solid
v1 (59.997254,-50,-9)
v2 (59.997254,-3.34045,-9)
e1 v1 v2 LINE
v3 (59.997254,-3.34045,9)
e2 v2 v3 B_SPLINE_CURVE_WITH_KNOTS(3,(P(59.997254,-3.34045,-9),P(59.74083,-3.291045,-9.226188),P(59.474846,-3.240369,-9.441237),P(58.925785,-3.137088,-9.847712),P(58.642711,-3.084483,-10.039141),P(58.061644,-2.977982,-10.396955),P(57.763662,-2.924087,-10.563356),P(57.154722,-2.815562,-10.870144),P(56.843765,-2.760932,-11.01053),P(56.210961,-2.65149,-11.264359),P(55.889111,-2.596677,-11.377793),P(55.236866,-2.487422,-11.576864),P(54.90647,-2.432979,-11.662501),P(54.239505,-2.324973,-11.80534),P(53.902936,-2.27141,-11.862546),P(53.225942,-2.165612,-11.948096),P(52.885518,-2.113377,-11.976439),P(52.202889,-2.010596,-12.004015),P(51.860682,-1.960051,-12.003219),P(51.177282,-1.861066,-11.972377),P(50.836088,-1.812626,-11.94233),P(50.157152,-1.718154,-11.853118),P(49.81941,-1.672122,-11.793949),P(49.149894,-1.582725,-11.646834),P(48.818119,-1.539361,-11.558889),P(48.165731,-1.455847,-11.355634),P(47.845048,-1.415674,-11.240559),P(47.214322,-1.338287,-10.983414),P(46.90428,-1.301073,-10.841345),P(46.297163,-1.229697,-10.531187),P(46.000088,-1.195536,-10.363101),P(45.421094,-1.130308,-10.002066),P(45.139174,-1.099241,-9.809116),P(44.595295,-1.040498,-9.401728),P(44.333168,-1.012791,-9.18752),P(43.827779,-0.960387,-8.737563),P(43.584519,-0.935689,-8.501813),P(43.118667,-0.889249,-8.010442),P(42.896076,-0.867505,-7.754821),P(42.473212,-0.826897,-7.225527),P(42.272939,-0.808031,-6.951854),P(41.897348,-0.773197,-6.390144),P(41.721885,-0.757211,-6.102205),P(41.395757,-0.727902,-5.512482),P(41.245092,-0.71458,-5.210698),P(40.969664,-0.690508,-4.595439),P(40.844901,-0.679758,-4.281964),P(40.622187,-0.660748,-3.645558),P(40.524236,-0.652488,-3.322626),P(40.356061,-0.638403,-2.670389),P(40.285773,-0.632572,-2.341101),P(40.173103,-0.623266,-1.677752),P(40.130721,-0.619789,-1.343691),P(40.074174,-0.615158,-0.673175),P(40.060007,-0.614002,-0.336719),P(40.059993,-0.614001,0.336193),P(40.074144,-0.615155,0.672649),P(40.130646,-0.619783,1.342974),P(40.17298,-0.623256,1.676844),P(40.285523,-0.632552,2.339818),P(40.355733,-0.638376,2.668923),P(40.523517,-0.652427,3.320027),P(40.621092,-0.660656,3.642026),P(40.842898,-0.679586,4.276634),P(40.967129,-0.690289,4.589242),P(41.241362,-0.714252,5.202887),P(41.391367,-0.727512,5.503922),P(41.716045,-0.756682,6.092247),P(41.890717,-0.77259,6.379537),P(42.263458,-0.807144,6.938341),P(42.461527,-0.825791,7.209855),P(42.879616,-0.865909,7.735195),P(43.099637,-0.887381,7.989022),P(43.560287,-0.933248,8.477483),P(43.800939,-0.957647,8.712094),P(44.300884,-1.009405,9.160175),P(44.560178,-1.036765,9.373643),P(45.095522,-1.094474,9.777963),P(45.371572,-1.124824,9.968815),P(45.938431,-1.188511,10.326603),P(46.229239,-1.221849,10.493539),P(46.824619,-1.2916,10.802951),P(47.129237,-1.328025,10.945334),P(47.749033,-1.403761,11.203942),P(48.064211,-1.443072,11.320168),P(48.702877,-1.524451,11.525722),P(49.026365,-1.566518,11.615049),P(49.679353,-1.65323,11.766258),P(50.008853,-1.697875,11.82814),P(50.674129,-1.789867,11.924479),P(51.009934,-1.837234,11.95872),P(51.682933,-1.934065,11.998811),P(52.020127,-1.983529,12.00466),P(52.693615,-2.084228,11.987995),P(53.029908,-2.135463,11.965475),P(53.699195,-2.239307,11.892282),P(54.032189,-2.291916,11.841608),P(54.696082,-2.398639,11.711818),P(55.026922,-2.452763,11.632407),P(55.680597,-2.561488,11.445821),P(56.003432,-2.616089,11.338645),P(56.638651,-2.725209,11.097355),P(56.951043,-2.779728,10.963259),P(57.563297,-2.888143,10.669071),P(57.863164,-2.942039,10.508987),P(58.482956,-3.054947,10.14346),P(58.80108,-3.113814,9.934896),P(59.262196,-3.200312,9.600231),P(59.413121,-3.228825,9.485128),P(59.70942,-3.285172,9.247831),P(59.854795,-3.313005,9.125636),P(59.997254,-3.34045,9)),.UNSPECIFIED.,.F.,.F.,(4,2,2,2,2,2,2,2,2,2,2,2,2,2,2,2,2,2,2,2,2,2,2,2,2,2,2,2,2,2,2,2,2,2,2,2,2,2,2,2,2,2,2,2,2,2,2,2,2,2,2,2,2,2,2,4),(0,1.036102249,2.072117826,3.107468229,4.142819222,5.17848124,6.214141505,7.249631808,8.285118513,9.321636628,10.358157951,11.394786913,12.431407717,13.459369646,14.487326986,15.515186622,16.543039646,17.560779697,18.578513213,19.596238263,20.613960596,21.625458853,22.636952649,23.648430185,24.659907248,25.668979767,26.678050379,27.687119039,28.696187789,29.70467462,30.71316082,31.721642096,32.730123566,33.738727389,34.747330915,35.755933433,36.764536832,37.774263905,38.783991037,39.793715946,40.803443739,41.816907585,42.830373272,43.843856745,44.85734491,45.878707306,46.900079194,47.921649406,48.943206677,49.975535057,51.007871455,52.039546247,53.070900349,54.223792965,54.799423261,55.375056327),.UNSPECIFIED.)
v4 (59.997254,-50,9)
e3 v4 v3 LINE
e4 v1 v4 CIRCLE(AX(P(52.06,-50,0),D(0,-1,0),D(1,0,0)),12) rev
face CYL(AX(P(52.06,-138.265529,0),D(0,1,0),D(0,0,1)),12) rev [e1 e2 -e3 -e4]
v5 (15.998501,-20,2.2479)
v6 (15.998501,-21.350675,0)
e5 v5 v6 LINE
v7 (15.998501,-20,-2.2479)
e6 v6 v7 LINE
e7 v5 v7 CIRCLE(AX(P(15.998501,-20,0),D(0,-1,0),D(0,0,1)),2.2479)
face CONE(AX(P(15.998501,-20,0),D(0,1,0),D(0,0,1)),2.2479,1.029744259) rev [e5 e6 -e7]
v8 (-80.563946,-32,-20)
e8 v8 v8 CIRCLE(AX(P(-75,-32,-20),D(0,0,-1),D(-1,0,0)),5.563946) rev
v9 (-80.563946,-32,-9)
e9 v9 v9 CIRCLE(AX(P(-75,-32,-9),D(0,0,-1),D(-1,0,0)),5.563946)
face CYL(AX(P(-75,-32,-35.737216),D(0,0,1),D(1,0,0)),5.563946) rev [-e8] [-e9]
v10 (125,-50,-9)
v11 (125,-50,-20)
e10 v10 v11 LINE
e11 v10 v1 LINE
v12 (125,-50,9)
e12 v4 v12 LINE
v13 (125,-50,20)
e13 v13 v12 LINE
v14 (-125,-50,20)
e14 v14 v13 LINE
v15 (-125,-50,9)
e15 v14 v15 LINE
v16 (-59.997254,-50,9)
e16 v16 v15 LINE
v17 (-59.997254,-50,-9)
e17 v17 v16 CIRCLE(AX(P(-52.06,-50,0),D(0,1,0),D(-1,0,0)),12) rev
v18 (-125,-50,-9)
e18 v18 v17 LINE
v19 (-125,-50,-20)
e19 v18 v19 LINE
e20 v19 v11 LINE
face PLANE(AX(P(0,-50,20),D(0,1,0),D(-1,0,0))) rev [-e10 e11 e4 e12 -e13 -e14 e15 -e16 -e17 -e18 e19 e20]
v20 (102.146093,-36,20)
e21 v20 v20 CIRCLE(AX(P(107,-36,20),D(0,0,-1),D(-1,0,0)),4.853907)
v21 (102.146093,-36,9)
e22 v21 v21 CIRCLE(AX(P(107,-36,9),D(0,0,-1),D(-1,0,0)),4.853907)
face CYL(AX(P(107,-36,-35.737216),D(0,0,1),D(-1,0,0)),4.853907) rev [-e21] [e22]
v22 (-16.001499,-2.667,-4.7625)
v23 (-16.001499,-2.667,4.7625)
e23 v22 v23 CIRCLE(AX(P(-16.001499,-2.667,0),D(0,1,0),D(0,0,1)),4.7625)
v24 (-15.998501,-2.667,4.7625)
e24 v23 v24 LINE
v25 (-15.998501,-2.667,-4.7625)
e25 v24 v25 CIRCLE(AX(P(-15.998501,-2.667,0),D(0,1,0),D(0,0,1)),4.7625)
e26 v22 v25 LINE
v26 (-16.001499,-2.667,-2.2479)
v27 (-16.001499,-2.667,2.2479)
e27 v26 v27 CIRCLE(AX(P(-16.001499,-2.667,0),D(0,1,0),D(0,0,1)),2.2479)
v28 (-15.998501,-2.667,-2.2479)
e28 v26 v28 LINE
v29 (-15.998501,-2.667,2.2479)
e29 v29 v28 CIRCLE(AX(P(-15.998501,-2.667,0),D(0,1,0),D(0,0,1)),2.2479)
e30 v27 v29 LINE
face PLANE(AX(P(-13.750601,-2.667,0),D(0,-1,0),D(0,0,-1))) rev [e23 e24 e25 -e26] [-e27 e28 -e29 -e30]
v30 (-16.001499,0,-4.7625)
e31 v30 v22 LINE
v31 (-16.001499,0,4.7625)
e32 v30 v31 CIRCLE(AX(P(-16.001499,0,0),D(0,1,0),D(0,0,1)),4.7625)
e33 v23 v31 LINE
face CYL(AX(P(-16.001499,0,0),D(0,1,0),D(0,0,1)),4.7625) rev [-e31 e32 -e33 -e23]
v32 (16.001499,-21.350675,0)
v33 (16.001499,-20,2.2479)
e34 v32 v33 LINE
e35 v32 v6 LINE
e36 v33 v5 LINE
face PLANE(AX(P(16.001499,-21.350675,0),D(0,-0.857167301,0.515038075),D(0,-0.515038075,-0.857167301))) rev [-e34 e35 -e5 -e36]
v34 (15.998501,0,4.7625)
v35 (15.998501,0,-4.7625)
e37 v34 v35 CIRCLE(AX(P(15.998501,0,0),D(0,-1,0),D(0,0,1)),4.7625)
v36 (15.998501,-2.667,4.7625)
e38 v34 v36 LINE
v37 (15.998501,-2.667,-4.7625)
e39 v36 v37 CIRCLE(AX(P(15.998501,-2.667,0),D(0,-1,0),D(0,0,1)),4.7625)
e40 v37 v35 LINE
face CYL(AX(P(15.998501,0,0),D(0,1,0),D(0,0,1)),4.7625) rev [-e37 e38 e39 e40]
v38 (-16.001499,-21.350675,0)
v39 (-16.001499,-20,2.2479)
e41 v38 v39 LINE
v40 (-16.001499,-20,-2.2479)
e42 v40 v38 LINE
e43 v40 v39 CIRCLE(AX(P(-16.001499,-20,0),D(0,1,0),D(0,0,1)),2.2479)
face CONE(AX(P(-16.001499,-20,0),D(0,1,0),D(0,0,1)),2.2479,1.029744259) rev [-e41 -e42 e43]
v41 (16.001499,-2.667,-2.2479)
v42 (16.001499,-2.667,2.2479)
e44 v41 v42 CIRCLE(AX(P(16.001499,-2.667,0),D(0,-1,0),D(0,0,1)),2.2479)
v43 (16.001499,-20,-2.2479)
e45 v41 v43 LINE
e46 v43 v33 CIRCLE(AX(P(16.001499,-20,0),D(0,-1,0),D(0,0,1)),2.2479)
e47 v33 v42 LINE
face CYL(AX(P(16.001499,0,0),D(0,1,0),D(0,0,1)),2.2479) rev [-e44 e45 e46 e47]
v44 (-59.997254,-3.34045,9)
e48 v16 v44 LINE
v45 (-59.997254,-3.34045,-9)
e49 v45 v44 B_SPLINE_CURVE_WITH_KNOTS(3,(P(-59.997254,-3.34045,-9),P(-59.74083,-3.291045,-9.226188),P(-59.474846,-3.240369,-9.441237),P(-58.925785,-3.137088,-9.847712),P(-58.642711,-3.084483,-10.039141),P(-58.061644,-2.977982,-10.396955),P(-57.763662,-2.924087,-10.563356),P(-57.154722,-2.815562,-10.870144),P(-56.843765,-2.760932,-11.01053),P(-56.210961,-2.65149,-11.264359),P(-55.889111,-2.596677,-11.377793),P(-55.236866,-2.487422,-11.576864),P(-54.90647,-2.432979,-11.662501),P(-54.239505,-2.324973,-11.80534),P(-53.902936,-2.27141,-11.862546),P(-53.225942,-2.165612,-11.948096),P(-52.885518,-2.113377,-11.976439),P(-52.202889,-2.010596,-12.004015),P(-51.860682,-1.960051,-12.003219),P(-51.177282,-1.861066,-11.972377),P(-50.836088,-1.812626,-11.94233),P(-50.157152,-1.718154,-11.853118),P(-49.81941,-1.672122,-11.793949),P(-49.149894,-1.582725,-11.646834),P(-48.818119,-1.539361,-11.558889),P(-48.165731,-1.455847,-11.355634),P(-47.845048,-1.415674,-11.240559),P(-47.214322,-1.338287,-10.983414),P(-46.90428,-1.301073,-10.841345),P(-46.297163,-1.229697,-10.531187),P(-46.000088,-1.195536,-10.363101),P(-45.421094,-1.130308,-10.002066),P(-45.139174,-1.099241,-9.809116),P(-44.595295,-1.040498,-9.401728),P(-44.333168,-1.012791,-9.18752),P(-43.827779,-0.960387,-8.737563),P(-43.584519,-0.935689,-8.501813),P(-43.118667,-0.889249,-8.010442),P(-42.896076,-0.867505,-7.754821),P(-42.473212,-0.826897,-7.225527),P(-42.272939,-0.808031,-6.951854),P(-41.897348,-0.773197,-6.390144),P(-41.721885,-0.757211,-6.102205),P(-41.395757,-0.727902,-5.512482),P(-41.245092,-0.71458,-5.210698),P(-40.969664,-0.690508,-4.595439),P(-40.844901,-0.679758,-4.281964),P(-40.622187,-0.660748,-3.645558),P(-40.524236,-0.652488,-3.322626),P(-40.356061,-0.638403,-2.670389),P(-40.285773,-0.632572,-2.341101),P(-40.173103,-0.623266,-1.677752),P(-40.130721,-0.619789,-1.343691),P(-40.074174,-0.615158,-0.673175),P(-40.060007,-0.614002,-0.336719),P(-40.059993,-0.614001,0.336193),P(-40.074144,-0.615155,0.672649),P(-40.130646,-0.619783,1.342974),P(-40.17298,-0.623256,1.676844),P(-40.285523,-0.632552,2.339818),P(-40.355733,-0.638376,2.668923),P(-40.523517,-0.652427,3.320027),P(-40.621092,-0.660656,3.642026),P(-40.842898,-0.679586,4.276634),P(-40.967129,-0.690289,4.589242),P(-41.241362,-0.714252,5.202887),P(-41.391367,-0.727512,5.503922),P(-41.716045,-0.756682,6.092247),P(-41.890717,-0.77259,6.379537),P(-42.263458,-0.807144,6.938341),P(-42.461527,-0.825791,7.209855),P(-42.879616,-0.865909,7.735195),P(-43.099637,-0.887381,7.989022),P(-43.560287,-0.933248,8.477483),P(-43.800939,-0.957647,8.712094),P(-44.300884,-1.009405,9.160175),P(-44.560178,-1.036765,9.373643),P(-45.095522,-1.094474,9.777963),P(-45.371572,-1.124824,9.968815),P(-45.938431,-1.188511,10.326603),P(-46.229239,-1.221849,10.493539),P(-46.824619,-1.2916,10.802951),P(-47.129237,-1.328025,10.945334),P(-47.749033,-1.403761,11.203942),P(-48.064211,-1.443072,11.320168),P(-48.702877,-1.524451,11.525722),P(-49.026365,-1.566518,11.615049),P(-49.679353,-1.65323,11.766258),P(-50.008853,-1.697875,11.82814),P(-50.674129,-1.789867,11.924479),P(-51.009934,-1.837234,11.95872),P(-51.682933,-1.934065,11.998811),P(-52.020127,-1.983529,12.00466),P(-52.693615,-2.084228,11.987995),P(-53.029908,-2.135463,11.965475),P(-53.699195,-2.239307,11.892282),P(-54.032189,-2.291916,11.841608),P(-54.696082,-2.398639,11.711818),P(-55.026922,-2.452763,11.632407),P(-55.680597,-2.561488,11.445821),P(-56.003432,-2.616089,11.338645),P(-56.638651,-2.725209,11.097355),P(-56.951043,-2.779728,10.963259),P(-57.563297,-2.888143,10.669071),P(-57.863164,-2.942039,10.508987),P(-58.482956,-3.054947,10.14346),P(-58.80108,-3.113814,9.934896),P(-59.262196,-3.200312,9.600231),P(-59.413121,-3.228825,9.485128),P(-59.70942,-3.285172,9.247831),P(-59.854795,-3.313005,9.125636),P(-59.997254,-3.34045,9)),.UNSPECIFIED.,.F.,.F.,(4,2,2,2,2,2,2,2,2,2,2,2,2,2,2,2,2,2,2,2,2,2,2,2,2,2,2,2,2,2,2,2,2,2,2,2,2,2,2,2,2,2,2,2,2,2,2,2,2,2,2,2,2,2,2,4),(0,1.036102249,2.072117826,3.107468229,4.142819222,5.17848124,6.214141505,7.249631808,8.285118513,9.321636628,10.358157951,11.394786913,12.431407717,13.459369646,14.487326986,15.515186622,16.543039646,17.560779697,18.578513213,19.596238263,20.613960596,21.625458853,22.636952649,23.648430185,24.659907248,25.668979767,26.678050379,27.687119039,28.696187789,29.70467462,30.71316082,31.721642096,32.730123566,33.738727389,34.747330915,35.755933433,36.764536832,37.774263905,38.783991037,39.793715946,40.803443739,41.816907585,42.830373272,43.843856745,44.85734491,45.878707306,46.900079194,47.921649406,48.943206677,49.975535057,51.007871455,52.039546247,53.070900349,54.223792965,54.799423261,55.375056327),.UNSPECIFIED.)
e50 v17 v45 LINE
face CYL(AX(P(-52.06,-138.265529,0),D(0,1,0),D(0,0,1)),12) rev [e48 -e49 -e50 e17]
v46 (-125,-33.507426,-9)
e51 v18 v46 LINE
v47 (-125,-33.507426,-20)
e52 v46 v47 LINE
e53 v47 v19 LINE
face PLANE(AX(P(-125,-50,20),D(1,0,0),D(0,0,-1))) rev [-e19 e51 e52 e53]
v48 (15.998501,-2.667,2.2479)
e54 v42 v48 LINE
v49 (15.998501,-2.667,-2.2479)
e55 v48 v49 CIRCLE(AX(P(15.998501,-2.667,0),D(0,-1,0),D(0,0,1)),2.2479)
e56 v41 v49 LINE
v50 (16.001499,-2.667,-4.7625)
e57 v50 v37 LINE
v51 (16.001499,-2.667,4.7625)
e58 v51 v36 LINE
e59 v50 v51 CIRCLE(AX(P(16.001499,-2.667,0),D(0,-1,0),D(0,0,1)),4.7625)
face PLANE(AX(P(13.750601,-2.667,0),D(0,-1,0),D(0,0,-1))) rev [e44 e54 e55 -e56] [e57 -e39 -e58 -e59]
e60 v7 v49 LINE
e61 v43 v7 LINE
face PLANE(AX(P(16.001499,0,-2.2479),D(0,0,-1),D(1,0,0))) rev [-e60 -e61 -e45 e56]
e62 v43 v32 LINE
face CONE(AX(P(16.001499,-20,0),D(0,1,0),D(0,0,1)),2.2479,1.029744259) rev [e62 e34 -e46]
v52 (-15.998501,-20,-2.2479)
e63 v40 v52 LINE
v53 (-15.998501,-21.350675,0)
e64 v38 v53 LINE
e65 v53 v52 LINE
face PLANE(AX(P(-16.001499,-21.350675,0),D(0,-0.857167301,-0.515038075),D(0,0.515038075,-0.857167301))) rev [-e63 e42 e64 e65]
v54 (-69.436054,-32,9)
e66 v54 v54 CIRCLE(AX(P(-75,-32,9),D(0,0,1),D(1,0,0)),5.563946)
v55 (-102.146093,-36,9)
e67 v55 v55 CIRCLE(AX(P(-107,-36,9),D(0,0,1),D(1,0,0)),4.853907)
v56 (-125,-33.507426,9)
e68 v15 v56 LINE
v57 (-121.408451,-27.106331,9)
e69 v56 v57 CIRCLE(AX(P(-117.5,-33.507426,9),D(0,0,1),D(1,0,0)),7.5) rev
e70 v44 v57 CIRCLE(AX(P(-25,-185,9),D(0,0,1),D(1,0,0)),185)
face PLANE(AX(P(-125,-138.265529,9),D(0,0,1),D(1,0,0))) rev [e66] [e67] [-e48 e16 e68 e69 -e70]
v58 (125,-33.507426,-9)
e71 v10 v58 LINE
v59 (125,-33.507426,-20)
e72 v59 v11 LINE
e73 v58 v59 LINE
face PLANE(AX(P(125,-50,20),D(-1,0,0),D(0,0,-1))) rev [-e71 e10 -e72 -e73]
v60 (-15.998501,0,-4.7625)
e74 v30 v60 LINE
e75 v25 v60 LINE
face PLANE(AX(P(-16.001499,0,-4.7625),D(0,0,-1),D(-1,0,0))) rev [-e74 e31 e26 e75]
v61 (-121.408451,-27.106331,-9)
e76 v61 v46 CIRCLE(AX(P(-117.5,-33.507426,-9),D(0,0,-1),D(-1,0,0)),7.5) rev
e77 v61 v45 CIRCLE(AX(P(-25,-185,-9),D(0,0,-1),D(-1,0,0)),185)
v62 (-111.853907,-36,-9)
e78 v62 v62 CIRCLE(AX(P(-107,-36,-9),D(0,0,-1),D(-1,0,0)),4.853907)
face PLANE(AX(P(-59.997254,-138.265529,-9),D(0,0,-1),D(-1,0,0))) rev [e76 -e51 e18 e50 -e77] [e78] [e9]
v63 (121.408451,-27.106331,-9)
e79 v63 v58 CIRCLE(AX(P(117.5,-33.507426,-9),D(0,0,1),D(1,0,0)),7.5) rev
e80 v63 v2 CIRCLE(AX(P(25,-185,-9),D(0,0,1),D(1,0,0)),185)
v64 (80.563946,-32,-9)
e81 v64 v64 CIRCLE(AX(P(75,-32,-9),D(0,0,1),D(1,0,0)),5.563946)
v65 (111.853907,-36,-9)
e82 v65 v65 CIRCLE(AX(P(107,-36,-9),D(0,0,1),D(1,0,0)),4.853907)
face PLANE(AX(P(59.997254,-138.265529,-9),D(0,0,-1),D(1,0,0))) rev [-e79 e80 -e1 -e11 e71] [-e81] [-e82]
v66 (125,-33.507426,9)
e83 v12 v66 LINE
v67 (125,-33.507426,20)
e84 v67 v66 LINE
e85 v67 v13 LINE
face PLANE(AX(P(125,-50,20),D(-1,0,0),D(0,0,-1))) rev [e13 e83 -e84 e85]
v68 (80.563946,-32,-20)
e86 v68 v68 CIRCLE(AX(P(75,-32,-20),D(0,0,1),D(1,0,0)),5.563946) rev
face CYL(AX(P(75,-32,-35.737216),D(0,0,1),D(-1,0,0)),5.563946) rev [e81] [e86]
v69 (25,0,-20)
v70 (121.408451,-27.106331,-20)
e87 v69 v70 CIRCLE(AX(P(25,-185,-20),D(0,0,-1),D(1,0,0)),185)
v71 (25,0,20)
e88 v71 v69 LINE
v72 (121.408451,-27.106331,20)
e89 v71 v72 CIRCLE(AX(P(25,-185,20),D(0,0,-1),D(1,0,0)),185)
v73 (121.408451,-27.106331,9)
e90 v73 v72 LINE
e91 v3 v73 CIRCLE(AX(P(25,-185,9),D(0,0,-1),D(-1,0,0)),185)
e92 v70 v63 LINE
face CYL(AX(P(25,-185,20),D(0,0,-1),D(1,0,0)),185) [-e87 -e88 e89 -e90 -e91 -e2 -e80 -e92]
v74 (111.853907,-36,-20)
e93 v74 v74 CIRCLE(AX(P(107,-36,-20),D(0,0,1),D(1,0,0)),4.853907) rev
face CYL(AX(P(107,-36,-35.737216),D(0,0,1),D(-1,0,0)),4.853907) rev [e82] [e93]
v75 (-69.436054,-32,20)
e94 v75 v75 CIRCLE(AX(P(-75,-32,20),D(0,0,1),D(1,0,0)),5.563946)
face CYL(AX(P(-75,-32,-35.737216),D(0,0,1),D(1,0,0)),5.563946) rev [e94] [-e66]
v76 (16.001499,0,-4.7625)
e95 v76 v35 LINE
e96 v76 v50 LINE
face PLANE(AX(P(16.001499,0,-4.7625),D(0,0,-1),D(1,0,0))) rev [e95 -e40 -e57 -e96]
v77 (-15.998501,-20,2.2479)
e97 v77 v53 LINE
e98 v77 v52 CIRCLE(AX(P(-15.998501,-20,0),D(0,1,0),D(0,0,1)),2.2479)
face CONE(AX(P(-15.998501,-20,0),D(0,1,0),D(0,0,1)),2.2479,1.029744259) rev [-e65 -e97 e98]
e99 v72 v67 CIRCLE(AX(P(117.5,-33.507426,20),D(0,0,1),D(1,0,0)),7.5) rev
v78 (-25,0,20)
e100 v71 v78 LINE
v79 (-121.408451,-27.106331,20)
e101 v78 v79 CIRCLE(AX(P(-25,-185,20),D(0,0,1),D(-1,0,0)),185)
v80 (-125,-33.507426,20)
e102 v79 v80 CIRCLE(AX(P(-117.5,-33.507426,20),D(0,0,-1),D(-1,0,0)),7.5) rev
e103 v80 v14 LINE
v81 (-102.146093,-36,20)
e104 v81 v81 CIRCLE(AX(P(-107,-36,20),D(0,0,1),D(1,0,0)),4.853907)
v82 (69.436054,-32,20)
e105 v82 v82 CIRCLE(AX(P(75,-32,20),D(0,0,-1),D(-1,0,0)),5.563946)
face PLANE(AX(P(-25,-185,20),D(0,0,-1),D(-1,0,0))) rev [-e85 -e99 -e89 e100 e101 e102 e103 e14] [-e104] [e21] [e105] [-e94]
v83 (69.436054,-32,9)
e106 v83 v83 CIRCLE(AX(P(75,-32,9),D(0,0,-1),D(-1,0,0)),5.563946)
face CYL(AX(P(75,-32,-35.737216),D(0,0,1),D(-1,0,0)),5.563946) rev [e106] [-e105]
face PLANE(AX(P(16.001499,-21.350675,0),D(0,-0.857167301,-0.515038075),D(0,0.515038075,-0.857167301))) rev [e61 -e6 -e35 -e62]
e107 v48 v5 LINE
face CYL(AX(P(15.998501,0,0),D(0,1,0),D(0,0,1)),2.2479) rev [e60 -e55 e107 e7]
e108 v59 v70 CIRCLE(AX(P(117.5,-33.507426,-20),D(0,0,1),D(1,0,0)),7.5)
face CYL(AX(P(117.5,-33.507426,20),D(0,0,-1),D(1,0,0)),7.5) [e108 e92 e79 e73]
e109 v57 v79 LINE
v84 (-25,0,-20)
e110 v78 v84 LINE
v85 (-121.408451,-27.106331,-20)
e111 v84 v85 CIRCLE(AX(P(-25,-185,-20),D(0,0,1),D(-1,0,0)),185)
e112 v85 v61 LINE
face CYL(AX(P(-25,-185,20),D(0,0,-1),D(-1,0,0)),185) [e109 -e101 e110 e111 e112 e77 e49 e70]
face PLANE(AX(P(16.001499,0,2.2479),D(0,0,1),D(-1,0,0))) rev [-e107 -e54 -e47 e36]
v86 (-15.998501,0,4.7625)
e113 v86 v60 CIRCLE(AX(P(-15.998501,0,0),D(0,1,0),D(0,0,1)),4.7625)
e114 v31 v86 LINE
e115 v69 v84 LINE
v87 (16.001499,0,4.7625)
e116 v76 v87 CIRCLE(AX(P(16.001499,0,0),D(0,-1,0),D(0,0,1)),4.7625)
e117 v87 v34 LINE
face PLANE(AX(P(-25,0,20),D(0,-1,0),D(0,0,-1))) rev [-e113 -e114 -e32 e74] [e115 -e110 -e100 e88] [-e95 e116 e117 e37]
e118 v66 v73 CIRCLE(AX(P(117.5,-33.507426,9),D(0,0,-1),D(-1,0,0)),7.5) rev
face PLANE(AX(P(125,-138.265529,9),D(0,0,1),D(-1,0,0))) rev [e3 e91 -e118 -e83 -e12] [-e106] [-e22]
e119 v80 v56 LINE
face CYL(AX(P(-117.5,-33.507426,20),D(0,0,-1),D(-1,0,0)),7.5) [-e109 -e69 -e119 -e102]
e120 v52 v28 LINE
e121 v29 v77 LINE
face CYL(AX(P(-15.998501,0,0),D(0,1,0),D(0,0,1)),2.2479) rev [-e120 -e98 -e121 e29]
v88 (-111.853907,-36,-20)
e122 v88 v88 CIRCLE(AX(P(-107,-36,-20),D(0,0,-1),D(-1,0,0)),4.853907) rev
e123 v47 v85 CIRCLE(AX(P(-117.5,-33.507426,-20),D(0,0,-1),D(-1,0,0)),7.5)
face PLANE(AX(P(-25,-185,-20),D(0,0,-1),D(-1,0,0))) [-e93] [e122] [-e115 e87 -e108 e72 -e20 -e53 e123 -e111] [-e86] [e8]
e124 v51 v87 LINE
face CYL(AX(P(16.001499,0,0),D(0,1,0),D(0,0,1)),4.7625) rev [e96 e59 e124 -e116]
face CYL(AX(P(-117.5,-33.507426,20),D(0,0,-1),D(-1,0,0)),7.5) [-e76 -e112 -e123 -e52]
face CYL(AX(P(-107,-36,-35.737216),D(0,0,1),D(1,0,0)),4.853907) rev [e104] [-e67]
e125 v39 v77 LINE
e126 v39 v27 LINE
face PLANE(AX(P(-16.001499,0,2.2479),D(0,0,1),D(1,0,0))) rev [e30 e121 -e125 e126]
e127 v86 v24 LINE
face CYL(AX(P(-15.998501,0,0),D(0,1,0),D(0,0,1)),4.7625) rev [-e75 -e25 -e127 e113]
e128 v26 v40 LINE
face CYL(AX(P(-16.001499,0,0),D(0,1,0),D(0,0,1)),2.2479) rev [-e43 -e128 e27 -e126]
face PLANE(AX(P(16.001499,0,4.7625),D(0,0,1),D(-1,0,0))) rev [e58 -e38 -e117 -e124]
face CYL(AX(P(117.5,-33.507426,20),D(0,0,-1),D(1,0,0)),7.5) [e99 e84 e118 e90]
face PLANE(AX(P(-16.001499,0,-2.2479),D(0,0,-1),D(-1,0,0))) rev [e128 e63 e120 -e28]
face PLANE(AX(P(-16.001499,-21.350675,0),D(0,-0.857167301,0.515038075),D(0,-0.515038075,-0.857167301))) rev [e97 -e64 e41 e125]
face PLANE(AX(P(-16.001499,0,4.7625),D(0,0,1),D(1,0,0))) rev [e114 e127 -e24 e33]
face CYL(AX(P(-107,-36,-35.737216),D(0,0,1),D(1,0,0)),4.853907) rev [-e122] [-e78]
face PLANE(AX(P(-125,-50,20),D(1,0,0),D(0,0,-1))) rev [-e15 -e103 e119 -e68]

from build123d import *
from build123d.topology import SkipClean

# Parameters (mm, degrees)
BOSS_EXTRUDE1_DEPTH                           = 20
CUT_EXTRUDE1_REACH                            = 138.107
CBORE_START                                   = -20
CBORE_SLOT_FOR_8_BINDING_HEAD_MACHINE_S_DEPTH = 20
CBORE_START_2                                 = -2.667
CBORE_SLOT_FOR_8_BINDING_HEAD_MACHI_3_DEPTH   = 2.667
CBORE_START_3                                 = -16.001499
CBORE_SLOT_FOR_8_BINDING_HEAD_MACHI_4_DEPTH   = 0.002997
CUT_EXTRUDE2_REACH                            = 142.446
SKETCH9_R                                     = 4.853907
SKETCH9_R_2                                   = 5.563946
FILLET2_R                                     = 7.5
FILLET3_R                                     = 7.5


with BuildPart() as part:
    # Sketch1 → Boss-Extrude1 (new, symmetric)
    with BuildSketch(Plane.XY):
        with BuildLine():
            Line((0, -50), (-125, -50))
            Line((-125, -50), (-125, -29.356176))
            ThreePointArc((-125, -29.356176), (-77.109944, -7.490694), (-25, 0))
            Line((-25, 0), (0, 0))
            Line((0, 0), (0, -50))
        make_face()
    extrude(amount=BOSS_EXTRUDE1_DEPTH, both=True)

    # Cut-Extrude1: up to this face of the body (flat: up to its plane)
    cut_extrude1_end = Plane(part.part.faces().sort_by_distance((-62.5, -50, 0))[0])
    # Sketch2 → Cut-Extrude1 (cut, up to the picked face)
    with BuildSketch(Plane(origin=(0, 0, 0), x_dir=(1, 0, 0), z_dir=(0, 1, 0)), mode=Mode.PRIVATE) as cut_extrude1_sk1:
        with BuildLine():
            Line((-59.997254, 9), (-125, 9))
            Line((-125, 9), (-125, -9))
            Line((-125, -9), (-59.997254, -9))
            ThreePointArc((-59.997254, -9), (-40.06, 0), (-59.997254, 9))
        make_face()
    cut_extrude1_tool1 = split(extrude(cut_extrude1_sk1.sketch, amount=-CUT_EXTRUDE1_REACH, mode=Mode.PRIVATE), bisect_by=cut_extrude1_end, keep=Keep.BOTH, mode=Mode.PRIVATE)
    add(cut_extrude1_tool1.solids().sort_by(Axis((-81.854242, 0, 0), (0, -1, 0)))[0], mode=Mode.SUBTRACT)

    # CBORE SLOT for #8 Binding Head Machine Screw2: read off the stored shape, not the designer's step
    # CBORE SLOT for _8 Binding Head Machi 2 → CBORE SLOT for #8 Binding Head Machine Screw2 (cut)
    with BuildSketch(Plane(origin=(0, 0, 0), x_dir=(1, 0, 0), z_dir=(0, 1, 0)).offset(CBORE_START)):
        with BuildLine():
            Line((-16.001499, -2.2479), (-15.998501, -2.2479))
            ThreePointArc((-15.998501, -2.2479), (-13.750601, 0), (-15.998501, 2.2479))
            Line((-15.998501, 2.2479), (-16.001499, 2.2479))
            ThreePointArc((-16.001499, 2.2479), (-18.249399, 0), (-16.001499, -2.2479))
        make_face()
    extrude(amount=CBORE_SLOT_FOR_8_BINDING_HEAD_MACHINE_S_DEPTH, mode=Mode.SUBTRACT)

    # CBORE SLOT for _8 Binding Head Machi 3 o → CBORE SLOT for _8 Binding Head Machi 3 (cut)
    with BuildSketch(Plane(origin=(0, 0, 0), x_dir=(1, 0, 0), z_dir=(0, 1, 0)).offset(CBORE_START_2)):
        with BuildLine():
            Line((-16.001499, -4.7625), (-15.998501, -4.7625))
            ThreePointArc((-15.998501, -4.7625), (-11.236001, 0), (-15.998501, 4.7625))
            Line((-15.998501, 4.7625), (-16.001499, 4.7625))
            ThreePointArc((-16.001499, 4.7625), (-20.763999, 0), (-16.001499, -4.7625))
        make_face()
        with BuildLine():
            ThreePointArc((-15.998501, 2.2479), (-13.750601, 0), (-15.998501, -2.2479))
            Line((-15.998501, -2.2479), (-16.001499, -2.2479))
            ThreePointArc((-16.001499, -2.2479), (-18.249399, 0), (-16.001499, 2.2479))
            Line((-16.001499, 2.2479), (-15.998501, 2.2479))
        make_face(mode=Mode.SUBTRACT)
    extrude(amount=CBORE_SLOT_FOR_8_BINDING_HEAD_MACHI_3_DEPTH, mode=Mode.SUBTRACT)

    # CBORE SLOT for _8 Binding Head Machi 4 o → CBORE SLOT for _8 Binding Head Machi 4 (cut)
    with BuildSketch(Plane.YZ.offset(CBORE_START_3)):
        Polygon((-20, 2.2479), (-21.350675, 0), (-20, -2.2479), align=None)
    extrude(amount=CBORE_SLOT_FOR_8_BINDING_HEAD_MACHI_4_DEPTH, mode=Mode.SUBTRACT)

    # CBORE SLOT for _8 Binding Head Machi 5 o → CBORE SLOT for _8 Binding Head Machi 5 (revolve, cut)
    with SkipClean():  # the faces are left unmerged after this step: merging them gives an invalid solid
        with BuildSketch(Plane(origin=(-15.998501, 0, 0), x_dir=(1, 0, 0), z_dir=(0, 0, 1))):
            Polygon((0, -20), (0, -21.350675), (2.2479, -20), align=None)
        revolve(axis=Axis((-15.998501, 0, 0), (0, 1, 0)), mode=Mode.SUBTRACT)

    # CBORE SLOT for _8 Binding Head Machi 6 o → CBORE SLOT for _8 Binding Head Machi 6 (revolve, cut)
    with SkipClean():  # the faces are left unmerged after this step: merging them gives an invalid solid
        with BuildSketch(Plane(origin=(-16.001499, 0, 0), x_dir=(1, 0, 0), z_dir=(0, 0, 1))):
            Polygon((0, -20), (0, -21.350675), (2.2479, -20), align=None)
        revolve(axis=Axis((-16.001499, 0, 0), (0, 1, 0)), mode=Mode.SUBTRACT)

    # Cut-Extrude2: up to this face of the body (flat: up to its plane)
    cut_extrude2_end = Plane(part.part.faces().sort_by_distance((-55.744446, -27.909229, -20))[0])
    # Sketch9 → Cut-Extrude2 (cut, up to the picked face)
    with BuildSketch(Plane.XY.offset(20), mode=Mode.PRIVATE) as cut_extrude2_sk1:
        with Locations(Location((-107, -36, 0), (0, 0, 180))):
            Circle(SKETCH9_R)
    cut_extrude2_tool1 = split(extrude(cut_extrude2_sk1.sketch, amount=-CUT_EXTRUDE2_REACH, mode=Mode.PRIVATE), bisect_by=cut_extrude2_end, keep=Keep.BOTH, mode=Mode.PRIVATE)
    # Sketch9 → Cut-Extrude2 (cut, up to the picked face)
    with BuildSketch(Plane.XY.offset(20), mode=Mode.PRIVATE) as cut_extrude2_sk2:
        with Locations(Location((-75, -32, 0), (0, 0, 180))):
            Circle(SKETCH9_R_2)
    cut_extrude2_tool2 = split(extrude(cut_extrude2_sk2.sketch, amount=-CUT_EXTRUDE2_REACH, mode=Mode.PRIVATE), bisect_by=cut_extrude2_end, keep=Keep.BOTH, mode=Mode.PRIVATE)
    add(cut_extrude2_tool1.solids().sort_by(Axis((-107, -36, 20), (0, 0, -1)))[0], mode=Mode.SUBTRACT)
    add(cut_extrude2_tool2.solids().sort_by(Axis((-75, -32, 20), (0, 0, -1)))[0], mode=Mode.SUBTRACT)

    # Fillet2
    fillet2_edges = [part.edges().sort_by_distance(p)[0] for p in [
        (-125, -29.356176, 14.5),
    ]]
    fillet(fillet2_edges, radius=FILLET2_R)

    # Fillet3
    fillet3_edges = [part.edges().sort_by_distance(p)[0] for p in [
        (-125, -29.356176, -14.5),
    ]]
    fillet(fillet3_edges, radius=FILLET3_R)

    # Mirror2: part across plane


with BuildPart() as part_1:
    with SkipClean():  # the faces are left unmerged after this step: merging them gives an invalid solid
        add(part.part)
        add(part.part.mirror(Plane(origin=(0, 0, 20), x_dir=(0, 0, 1), z_dir=(-1, 0, 0))))


solid = part_1.part
